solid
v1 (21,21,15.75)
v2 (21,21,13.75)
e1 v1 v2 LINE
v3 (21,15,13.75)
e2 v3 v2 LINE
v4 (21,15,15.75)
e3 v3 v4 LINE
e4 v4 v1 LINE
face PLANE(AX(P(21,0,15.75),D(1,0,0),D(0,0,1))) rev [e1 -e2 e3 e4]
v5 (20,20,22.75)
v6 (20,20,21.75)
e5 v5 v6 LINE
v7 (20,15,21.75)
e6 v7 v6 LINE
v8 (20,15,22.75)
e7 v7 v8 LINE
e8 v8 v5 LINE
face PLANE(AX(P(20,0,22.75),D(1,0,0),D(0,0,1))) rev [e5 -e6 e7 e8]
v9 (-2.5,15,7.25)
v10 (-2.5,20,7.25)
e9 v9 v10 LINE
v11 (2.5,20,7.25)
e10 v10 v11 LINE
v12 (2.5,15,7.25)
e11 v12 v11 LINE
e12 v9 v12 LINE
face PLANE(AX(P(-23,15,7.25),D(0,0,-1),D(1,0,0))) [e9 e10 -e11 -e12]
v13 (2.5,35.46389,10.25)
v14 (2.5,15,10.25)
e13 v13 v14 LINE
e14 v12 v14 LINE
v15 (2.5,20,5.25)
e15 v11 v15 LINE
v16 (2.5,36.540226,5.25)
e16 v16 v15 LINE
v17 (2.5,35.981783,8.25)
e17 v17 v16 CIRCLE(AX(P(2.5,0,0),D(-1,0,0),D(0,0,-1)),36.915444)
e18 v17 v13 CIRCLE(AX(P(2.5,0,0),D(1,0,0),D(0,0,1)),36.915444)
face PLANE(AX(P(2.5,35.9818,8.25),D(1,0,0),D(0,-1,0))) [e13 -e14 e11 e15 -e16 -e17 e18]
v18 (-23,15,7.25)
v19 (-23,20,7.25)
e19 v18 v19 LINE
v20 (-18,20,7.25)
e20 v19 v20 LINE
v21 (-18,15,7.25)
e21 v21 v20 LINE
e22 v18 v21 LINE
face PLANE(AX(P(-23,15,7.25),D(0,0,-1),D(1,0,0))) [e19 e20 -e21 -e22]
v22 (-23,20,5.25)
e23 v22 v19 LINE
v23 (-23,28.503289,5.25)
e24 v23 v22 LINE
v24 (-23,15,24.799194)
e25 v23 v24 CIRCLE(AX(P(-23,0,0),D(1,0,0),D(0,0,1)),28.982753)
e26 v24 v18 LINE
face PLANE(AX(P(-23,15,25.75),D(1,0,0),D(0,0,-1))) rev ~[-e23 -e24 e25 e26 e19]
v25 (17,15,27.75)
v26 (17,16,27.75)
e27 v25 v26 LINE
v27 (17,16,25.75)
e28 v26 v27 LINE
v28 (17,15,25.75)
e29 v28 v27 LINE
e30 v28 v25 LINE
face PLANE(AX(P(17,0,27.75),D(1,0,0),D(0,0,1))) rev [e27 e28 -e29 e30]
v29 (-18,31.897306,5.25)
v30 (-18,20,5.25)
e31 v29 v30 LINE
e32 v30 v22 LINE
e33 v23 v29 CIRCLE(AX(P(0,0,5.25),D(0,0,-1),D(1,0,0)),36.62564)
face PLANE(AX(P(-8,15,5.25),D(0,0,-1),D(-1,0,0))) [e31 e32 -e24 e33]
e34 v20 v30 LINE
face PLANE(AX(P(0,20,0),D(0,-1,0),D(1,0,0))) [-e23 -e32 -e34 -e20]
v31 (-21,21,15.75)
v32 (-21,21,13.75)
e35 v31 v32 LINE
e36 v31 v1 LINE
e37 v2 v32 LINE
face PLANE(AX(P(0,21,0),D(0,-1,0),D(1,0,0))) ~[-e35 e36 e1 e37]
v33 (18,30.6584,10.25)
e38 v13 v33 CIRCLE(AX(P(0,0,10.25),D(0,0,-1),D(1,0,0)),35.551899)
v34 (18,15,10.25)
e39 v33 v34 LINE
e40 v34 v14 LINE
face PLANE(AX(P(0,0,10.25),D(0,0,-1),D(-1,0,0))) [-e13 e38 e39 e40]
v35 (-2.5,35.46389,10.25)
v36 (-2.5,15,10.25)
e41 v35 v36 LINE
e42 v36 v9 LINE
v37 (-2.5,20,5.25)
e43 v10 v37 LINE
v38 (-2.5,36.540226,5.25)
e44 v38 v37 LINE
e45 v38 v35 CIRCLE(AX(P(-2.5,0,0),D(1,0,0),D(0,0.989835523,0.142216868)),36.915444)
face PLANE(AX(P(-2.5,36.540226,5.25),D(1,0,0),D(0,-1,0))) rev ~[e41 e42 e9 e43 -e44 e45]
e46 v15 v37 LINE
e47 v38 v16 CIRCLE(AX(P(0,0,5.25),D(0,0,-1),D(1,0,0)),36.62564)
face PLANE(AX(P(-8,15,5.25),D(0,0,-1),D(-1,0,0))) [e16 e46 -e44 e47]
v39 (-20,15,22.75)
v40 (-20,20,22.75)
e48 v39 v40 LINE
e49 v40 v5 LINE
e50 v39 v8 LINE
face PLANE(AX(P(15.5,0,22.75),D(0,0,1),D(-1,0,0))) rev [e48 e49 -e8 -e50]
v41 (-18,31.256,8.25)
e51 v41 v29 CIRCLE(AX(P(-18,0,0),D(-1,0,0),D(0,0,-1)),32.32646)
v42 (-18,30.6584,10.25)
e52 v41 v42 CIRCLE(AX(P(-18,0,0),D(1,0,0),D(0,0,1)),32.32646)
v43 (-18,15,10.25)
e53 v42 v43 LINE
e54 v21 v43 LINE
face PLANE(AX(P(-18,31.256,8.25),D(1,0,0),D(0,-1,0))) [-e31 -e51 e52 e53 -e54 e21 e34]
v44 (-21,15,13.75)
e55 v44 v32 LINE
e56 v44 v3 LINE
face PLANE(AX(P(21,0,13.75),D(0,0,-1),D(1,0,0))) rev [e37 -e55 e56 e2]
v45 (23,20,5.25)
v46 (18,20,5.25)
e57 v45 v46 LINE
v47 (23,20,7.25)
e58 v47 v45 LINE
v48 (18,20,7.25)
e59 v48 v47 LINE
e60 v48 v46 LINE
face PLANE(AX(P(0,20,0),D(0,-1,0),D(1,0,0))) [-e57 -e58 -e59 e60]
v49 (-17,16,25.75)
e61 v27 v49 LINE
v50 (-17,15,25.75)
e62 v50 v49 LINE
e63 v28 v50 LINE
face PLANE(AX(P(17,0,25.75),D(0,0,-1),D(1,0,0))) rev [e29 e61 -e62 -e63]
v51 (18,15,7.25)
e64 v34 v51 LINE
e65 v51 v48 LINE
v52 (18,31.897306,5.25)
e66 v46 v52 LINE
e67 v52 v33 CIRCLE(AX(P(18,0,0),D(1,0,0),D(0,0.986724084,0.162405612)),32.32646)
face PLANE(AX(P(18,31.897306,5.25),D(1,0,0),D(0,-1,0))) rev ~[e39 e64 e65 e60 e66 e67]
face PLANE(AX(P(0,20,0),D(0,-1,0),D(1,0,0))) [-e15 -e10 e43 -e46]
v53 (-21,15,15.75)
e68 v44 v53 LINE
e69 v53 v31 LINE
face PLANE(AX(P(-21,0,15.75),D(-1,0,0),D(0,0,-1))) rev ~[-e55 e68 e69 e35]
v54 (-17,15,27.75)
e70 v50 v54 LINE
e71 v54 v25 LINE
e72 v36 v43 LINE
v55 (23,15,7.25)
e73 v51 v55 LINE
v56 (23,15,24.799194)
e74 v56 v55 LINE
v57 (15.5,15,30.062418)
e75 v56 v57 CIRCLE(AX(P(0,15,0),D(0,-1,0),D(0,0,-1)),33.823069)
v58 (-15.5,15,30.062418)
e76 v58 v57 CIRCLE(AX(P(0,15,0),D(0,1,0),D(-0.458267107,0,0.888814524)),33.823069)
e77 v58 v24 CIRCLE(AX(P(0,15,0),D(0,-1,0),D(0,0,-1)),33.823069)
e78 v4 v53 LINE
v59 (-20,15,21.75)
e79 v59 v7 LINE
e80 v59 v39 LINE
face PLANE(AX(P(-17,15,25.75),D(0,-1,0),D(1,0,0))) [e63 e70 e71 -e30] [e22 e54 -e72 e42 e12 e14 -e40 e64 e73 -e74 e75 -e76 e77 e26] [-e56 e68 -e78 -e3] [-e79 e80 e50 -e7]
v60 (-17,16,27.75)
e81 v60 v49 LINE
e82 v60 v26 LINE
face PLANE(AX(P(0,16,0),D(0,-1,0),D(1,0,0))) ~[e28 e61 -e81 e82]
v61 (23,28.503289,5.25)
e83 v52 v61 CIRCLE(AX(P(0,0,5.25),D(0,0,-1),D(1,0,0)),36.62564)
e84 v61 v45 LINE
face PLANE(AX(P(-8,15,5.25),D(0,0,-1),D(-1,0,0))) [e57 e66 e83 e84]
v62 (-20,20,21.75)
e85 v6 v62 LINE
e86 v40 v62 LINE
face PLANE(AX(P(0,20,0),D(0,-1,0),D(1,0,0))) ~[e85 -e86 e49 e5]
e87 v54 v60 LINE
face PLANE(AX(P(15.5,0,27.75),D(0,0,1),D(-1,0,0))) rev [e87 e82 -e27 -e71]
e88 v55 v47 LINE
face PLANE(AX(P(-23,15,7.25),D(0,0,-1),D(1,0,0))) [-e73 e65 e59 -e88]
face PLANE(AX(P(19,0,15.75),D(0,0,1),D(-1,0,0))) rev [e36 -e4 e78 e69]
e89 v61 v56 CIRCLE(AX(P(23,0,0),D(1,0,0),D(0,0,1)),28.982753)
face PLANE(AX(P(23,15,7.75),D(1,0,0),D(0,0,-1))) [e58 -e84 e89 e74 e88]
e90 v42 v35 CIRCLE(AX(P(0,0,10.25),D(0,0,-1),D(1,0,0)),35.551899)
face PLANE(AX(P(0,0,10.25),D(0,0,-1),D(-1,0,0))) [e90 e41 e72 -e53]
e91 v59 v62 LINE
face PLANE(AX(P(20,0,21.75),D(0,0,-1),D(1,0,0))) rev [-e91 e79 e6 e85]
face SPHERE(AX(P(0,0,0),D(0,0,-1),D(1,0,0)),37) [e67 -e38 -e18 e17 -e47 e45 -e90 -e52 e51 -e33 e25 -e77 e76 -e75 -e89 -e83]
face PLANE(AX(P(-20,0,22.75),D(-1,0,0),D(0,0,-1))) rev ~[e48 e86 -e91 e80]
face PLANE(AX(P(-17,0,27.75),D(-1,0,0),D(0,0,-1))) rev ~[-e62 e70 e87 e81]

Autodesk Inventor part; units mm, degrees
sketch "スケッチ1" plane through (0, 0, 0) normal (0, 1, 0) x (-1, 0, 0)
  circle A0 centre (0, 0) radius 37
  line L0 (0, 0) -> (0, -37)
  line L1 (0, 0) -> (0, 37)
  dimension "d0" = 74
revolve "回転1" add sketch "スケッチ1" angle 180 about axis through (0, 0, 0) along (0, 0, 1) picked at (-2.7444, -24.3574) contours L1 L0 A0
sketch "スケッチ5" plane through (0, 0, 0) normal (0, -1, 0) x (1, 0, 0)
  line L0 (-20, -25) -> (20, -25)
  line L1 (20, -25) -> (20, -15)
  line L2 (20, -15) -> (-20, -15)
  line L3 (-20, -15) -> (-20, -25)
  line L4 (-20, -17) -> (-20, -15)
  line L5 (0, 27.75) -> (-17, 27.75)
  line L6 (-17, 27.75) -> (-17, 25.75)
  line L7 (-17, 25.75) -> (0, 25.75)
  line L8 (0, 25.75) -> (0, 27.75)
  line L9 (0, 22.75) -> (-20, 22.75)
  line L10 (-20, 22.75) -> (-20, 21.75)
  line L11 (-20, 21.75) -> (0, 21.75)
  line L12 (0, 21.75) -> (0, 22.75)
  line L13 (0, 15.75) -> (-21, 15.75)
  line L14 (-21, 15.75) -> (-21, 13.75)
  line L15 (-21, 13.75) -> (0, 13.75)
  line L16 (0, 13.75) -> (0, 15.75)
  line L17 (0, 7.75) -> (-23, 7.75)
  line L18 (-23, 7.75) -> (-23, 5.25)
  line L19 (-23, 5.25) -> (0, 5.25)
  line L20 (0, 5.25) -> (0, 7.75)
  circle A0 centre (0, 0) radius 37 projected
  circle A1 centre (0, 0) radius 37 projected
  line L21 (0, 37) -> (0, -37)
  line L22 (37, 0) -> (-37, 0)
  line L23 (-32.5, 5.25) -> (-23, 5.25)
  line L24 (-23, 5.25) -> (-23, -5.25)
  line L25 (-23, -5.25) -> (-32.5, -5.25)
  line L26 (-32.5, -5.25) -> (-32.5, 5.25)
  line L27 (-23, -8.0262) -> (-23, 5.25)
  line L28 (-27, 25.2982) -> (-27, -25.2982)
  line L29 (-15.5, 27.75) -> (-12, 27.75)
  line L30 (-12, 27.75) -> (-12, 35)
  line L31 (-12, 35) -> (-15.5, 35)
  line L32 (-15.5, 35) -> (-15.5, 27.75)
  line L33 (-15.5, 25.75) -> (0, 25.75)
  line L34 (0, 25.75) -> (0, 22.75)
  line L35 (0, 22.75) -> (-15.5, 22.75)
  line L36 (-15.5, 22.75) -> (-15.5, 25.75)
  line L37 (-19, 15.75) -> (0, 15.75)
  line L38 (0, 15.75) -> (0, 21.75)
  line L39 (0, 21.75) -> (-19, 21.75)
  line L40 (-19, 21.75) -> (-19, 15.75)
  line L41 (-19, 13.75) -> (0, 13.75)
  line L42 (0, 13.75) -> (0, 7.75)
  line L43 (0, 7.75) -> (-19, 7.75)
  line L44 (-19, 7.75) -> (-19, 13.75)
  line L45 (-23, 0) -> (-40.624, 0)
  line L46 (-23, 0) -> (-8.7712, 0)
  line L47 (-9.875, 5.25) -> (-23, 5.25)
  line L48 (-23, 5.25) -> (-23, -5.25)
  line L49 (-23, -5.25) -> (-9.875, -5.25)
  line L50 (-9.875, 5.25) -> (-23, -5.25) construction
  line L51 (-23, 5.25) -> (-9.875, -5.25) construction
  line L52 (-23, 7.25) -> (-33.5, 7.25)
  line L53 (-33.5, 7.25) -> (-33.5, -7.25)
  line L54 (-33.5, -7.25) -> (-23, -7.25)
  line L55 (-23, -7.25) -> (-23, 7.25)
  line L56 (-23, 7.25) -> (-33.5, -7.25) construction
  line L57 (-33.5, 7.25) -> (-23, -7.25) construction
  line L58 (-6.125, 5.25) -> (0, 5.25)
  line L59 (0, 5.25) -> (0, -5.25)
  line L60 (0, -5.25) -> (-6.125, -5.25)
  line L61 (-6.125, 5.25) -> (0, -5.25) construction
  line L62 (0, 5.25) -> (-6.125, -5.25) construction
  line L63 (-23, 5.25) -> (-27, 5.25)
  line L64 (-23, -5.25) -> (-27, -5.25)
  line L65 (-23, 7.25) -> (-27, 7.25)
  line L66 (-23, -7.25) -> (-27, -7.25)
  line L67 (26.3249, -26) -> (-26.3249, -26)
  line L68 (-6.125, 5.25) -> (-6.8, 5.25)
  line L69 (-6.2297, -5.25) -> (-6.125, -5.25)
  line L70 (-6.125, -5.25) -> (-6.125, 5.25)
  line L71 (-3, 7.75) -> (0, 7.75)
  line L72 (0, 22.75) -> (-4, 22.75)
  line L73 (-4, 21.75) -> (0, 21.75)
  line L74 (0, 21.75) -> (0, 22.75)
  line L75 (-6, 7.75) -> (-1, 7.75)
  line L76 (0, 5.25) -> (-6, 5.25)
  point P0 (0, -25)
  point P1 (0, -15)
  point P2 (0, 26.75)
  point P3 (0, 22.25)
  point P4 (0, 14.75)
  point P5 (0, 6.5)
  point P6 (-20, -20)
  point P7 (-27, -0.5262)
  point P8 (-27, -5.25)
  point P9 (-15.5, 24.25)
  point P10 (-15.5, 33.5969)
  point P11 (0, 27.75)
  point P12 (0, 37)
  point P13 (0, 25.75)
  point P14 (0, 13.75)
  point P15 (0, 15.75)
  point P16 (-27, 0)
  point P17 (-32.5, 0)
  point P18 (-23, 0)
  point P19 (-16.4375, 0)
  point P20 (-28.25, 0)
  point P21 (-3.0625, 0)
  point P22 (-27, 0.5)
  point P23 (-28, 0.4738)
  point P24 (-28, -11.5262)
  point P25 (-27, -11.5)
  point P26 (-23, -5.25)
  point P27 (-23, 5.25)
  point P28 (-23, -5.25)
  point P29 (0, 0)
  point P30 (-8, 6)
  point P31 (-26.3249, -26)
  point P32 (-8, -6)
  point P33 (0, 21.75)
  point P34 (0, 22.75)
  point P35 (-27, -7.25)
  point P36 (-27, 7.25)
  point P37 (-19, 10.75)
  dimension "d12" = 40
  dimension "d13" = 10
  dimension "d23" = 17
  dimension "d24" = 2
  dimension "d27" = 20
  dimension "d28" = 1
  dimension "d30" = 21
  dimension "d31" = 2
  dimension "d33" = 2.5
  dimension "d88" = 0
  dimension "d89" = 0
  dimension "d90" = 12
  dimension "d92" = 20
  dimension "d97" = 9.5
  dimension "d98" = 10.5
  dimension "d113" = 27
  dimension "d122" = 15.5
  dimension "d124" = 3
  dimension "d125" = 15.5
  dimension "d126" = 6
  dimension "d127" = 6
  dimension "d147" = 10.5
  dimension "d161" = 14.5
  dimension "d162" = 10.5
  dimension "d164" = 10.5
  dimension "d170" = 26
  dimension "d207" = 0
  dimension "d283" = 2
  dimension "d284" = 2
  dimension "d297" = 23
extrude "GNSボード" cut sketch "スケッチ5" against normal blind 16 contours L8 L7 L6 L5
extrude "GNSボード止めるよう" cut sketch "スケッチ5" against normal blind 15 contours L21 L5 L30 A0 | L30 L5 L32 A0 | L21 L9 L36 L7
extrude "アルミ板１" cut sketch "スケッチ5" against normal blind 20 contours L12 L11 L10 L9
extrude "メイン基板" cut sketch "スケッチ5" against normal blind 21 contours L15 L14 L13 L16
extrude "メイン止めるよう" cut sketch "スケッチ5" against normal blind 14.5 contours L17 L44 L15 L21 | L13 L40 L11 L21
extrude "アルミ板２" cut sketch "スケッチ5" against normal blind 20 contours L19 L18 L17 L20
extrude "電池ボックス入れ" cut sketch "スケッチ5" against normal blind 13 contours L3 L2 L21 L0 | L21 L2 L1 L0
extrude "side ut" cut sketch "スケッチ5" against normal blind 100 contours A0 L22 L53 L54 L28 | A0 L28 L52 L53 L22 | L54 L53 L22 L26 L25 L28 | L53 L52 L28 L23 L26 L22 | L25 L26 L22 L28 | L26 L23 L28 L22
extrude "motor case" add sketch "スケッチ5" against normal blind 7 contours L54 L53 L22 L26 L25 L28 | L28 L25 L27 L54 | L53 L52 L28 L23 L26 L22 | L28 L22 L24 L25 | L25 L26 L22 L28 | L22 L28 L23 L24 | L52 L18 L23 L28 | L26 L23 L28 L22
extrude "bottom cut" cut sketch "スケッチ5" against normal blind 90 contours L67 A0 L21 | L21 A0 L67
extrude "motor" [suppressed]
extrude "motor block" [suppressed]
sketch "スケッチ27" plane through (-33.5, 0, -7.25) normal (-1, 0, 0) x (0, 0, 1)
  line L0 (14.5, 0) -> (0, 0) projected
  circle A0 centre (7.25, 0) radius 3
  point P0 (7.25, 0)
  dimension "d198" = 6
extrude "押し出し36" cut sketch "スケッチ27" against normal blind 27
mirror "ミラー13" about plane through (0, 0, 0) normal (1, 0, 0) of "メイン止めるよう", "メイン基板", "アルミ板１", "GNSボード止めるよう", "GNSボード", "アルミ板２", "motor case", "押し出し36", "電池ボックス入れ", "side ut"
ref_plane "作業平面5" through (-17, 17.5, 25.75) normal (0, -1, 0) x (1, 0, 0)
ref_plane "作業平面6" through (20, 13, -15) normal (0, 0, -1) x (1, 0, 0)
sketch "スケッチ38" plane through (20, 13, -15) normal (0, 0, -1) x (1, 0, 0)
  line L0 (-40, 13) -> (0, 13) projected
  line L1 (-40, 13) -> (-40, 0) projected
  line L2 (-40, 0) -> (0, 0) projected
  line L3 (0, 13) -> (0, 0) projected
  line L4 (-38, 6) -> (-28, 6)
  line L5 (-28, 6) -> (-28, -3)
  line L6 (-28, -3) -> (-38, -3)
  line L7 (-38, -3) -> (-38, 6)
  point P0 (-20, 13)
  dimension "d235" = 3
  dimension "d236" = 9
  dimension "d237" = 10
  dimension "d238" = 2
extrude "押し出し44" cut sketch "スケッチ38" against normal blind 18 contours L7 L4 L5 L2 | L2 L5 L6 L7
ref_plane "作業平面7" through (27, 35, 7.25) normal (0, -1, 0) x (1, 0, 0)
sketch "スケッチ41" plane through (-17, 0, 25.75) normal (0, -1, 0) x (1, 0, 0)
  line L0 (-16.5, -22.75) -> (10.5, -22.75) projected
  line L1 (-6, -20.5) -> (-6, -18) projected
  line L2 (-6, -18) -> (-2, -18) projected
  line L3 (-2, -18) -> (-2, -12) projected
  line L4 (-2, -12) -> (-4, -12) projected
  line L5 (-4, -12) -> (-4, -10) projected
  line L6 (-4, -10) -> (-2, -10) projected
  line L7 (-2, -10) -> (-2, -4) projected
  line L8 (-2, -4) -> (-3, -4) projected
  line L9 (-3, -4) -> (-3, -3) projected
  line L10 (-3, -3) -> (1.5, -3) projected
  line L11 (1.5, -3) -> (1.5, 0) projected
  line L12 (1.5, 0) -> (0, 0) projected
  line L13 (0, 0) -> (0, 2) projected
  line L14 (0, 2) -> (1.5, 2) projected
  line L15 (1.5, 2) -> (1.5, 7.8469) projected
  arc A0 (1.5, 7.8469) -> (-10, -0.4518) centre (17, -25.75) ccw projected
  line L16 (-10, -0.4518) -> (-10, -18.5) projected
  line L17 (-10, -18.5) -> (-16.5, -18.5) projected
  line L18 (-16.5, -18.5) -> (-16.5, -22.75) projected
  line L19 (-2, -18) -> (-2, -12) projected
  line L20 (-4, -10) -> (-4, -12) projected
  line L21 (0, 2) -> (0, 0) projected
  circle A1 centre (-4, 0) radius 2
  line L22 (50.5, -28.75) -> (23.5, -28.75) projected
  line L23 (23.5, -28.75) -> (23.5, -22.75) projected
  line L24 (23.5, -22.75) -> (50.5, -22.75) projected
  line L25 (50.5, -18.5) -> (50.5, -22.75) projected
  line L26 (44, -18.5) -> (50.5, -18.5) projected
  line L27 (44, -18.5) -> (44, -0.4518) projected
  arc A2 (44, -0.4518) -> (32.5, 7.8469) centre (17, -25.75) ccw projected
  line L28 (32.5, 7.8469) -> (32.5, 2) projected
  line L29 (32.5, 2) -> (34, 2) projected
  line L30 (34, 2) -> (34, 0) projected
  line L31 (34, 0) -> (32.5, 0) projected
  line L32 (32.5, 0) -> (32.5, -3) projected
  line L33 (32.5, -3) -> (37, -3) projected
  line L34 (37, -3) -> (37, -4) projected
  line L35 (37, -4) -> (36, -4) projected
  line L36 (36, -4) -> (36, -10) projected
  line L37 (36, -10) -> (38, -10) projected
  line L38 (38, -10) -> (38, -12) projected
  line L39 (38, -12) -> (36, -12) projected
  line L40 (36, -12) -> (36, -18) projected
  line L41 (36, -18) -> (40, -18) projected
  line L42 (40, -18) -> (40, -20.5) projected
  line L43 (40, -20.5) -> (-6, -20.5) projected
  line L44 (10.5, -22.75) -> (10.5, -28.75) projected
  line L45 (10.5, -28.75) -> (-16.5, -28.75) projected
  line L46 (-16.5, -28.75) -> (-16.5, -33) projected
  line L47 (-16.5, -33) -> (-10, -33) projected
  line L48 (-10, -33) -> (-10, -51.0482) projected
  arc A3 (-10, -51.0482) -> (-9.3249, -51.75) centre (17, -25.75) ccw projected
  line L49 (-9.3249, -51.75) -> (43.3249, -51.75) projected
  arc A4 (43.3249, -51.75) -> (44, -51.0482) centre (17, -25.75) ccw projected
  line L50 (44, -51.0482) -> (44, -33) projected
  line L51 (50.5, -33) -> (44, -33) projected
  line L52 (50.5, -28.75) -> (50.5, -33) projected
  dimension "d252" = 4
  dimension "d253" = 4
  dimension "d254" = 3
extrude "押し出し46" cut sketch "スケッチ41" against normal blind 10 contours A1
mirror "ミラー15" about plane through (0, 0, 0) normal (1, 0, 0) of "押し出し46"
sketch "スケッチ42" plane through (-33.5, 0, -7.25) normal (0, -1, 0) x (1, 0, 0)
  circle A0 centre (10, -8) radius 2
  line L0 (13.5, -17.75) -> (13.5, -7.75) projected
  line L1 (10, 2) -> (1, 2) projected
  point P0 (33.5, 7.25)
  dimension "d257" = 3.5
  dimension "d258" = 4
  dimension "d259" = 10
extrude "押し出し47" cut sketch "スケッチ42" against normal blind 10
mirror "ミラー16" about plane through (0, 0, 0) normal (1, 0, 0) of "押し出し47"
ref_plane "作業平面8" through (-17, 15, 25.75) normal (0, -1, 0) x (1, 0, 0)
sketch "スケッチ45" plane through (-17, 15, 25.75) normal (0, -1, 0) x (1, 0, 0)
  circle A0 centre (-4, 0) radius 2 projected
  line L0 (-16.5, -22.75) -> (10.5, -22.75) projected
  line L1 (-6, -20.5) -> (-6, -18) projected
  line L2 (-6, -18) -> (-2, -18) projected
  line L3 (-2, -18) -> (-2, -12) projected
  line L4 (-2, -12) -> (-4, -12) projected
  line L5 (-4, -12) -> (-4, -10) projected
  line L6 (-4, -10) -> (-2, -10) projected
  line L7 (-2, -10) -> (-2, -4) projected
  line L8 (-2, -4) -> (-3, -4) projected
  line L9 (-3, -4) -> (-3, -3) projected
  line L10 (-3, -3) -> (1.5, -3) projected
  line L11 (1.5, -3) -> (1.5, 0) projected
  line L12 (1.5, 0) -> (0, 0) projected
  line L13 (0, 0) -> (0, 2) projected
  line L14 (0, 2) -> (1.5, 2) projected
  line L15 (1.5, 2) -> (1.5, 7.8469) projected
  arc A1 (1.5, 7.8469) -> (-10, -0.4518) centre (17, -25.75) ccw projected
  line L16 (-10, -0.4518) -> (-10, -18.5) projected
  line L17 (-10, -18.5) -> (-16.5, -18.5) projected
  line L18 (-16.5, -18.5) -> (-16.5, -22.75) projected
  arc A2 (32.5, 4.3124) -> (1.5, 4.3124) centre (17, -25.75) ccw projected
  line L19 (1.5, 2) -> (1.5, 4.3124) projected
  line L20 (32.5, 2) -> (1.5, 2) projected
  line L21 (32.5, 2) -> (32.5, 4.3124) projected
  circle A3 centre (38, 0) radius 2 projected
  circle A4 centre (38, 0) radius 2 projected
  line L22 (23.5, -22.75) -> (50.5, -22.75) projected
  line L23 (50.5, -18.5) -> (50.5, -22.75) projected
  line L24 (44, -18.5) -> (50.5, -18.5) projected
  line L25 (44, -18.5) -> (44, -0.4518) projected
  arc A5 (44, -0.4518) -> (32.5, 7.8469) centre (17, -25.75) ccw projected
  line L26 (32.5, 7.8469) -> (32.5, 2) projected
  line L27 (32.5, 2) -> (34, 2) projected
  line L28 (34, 2) -> (34, 0) projected
  line L29 (34, 0) -> (32.5, 0) projected
  line L30 (32.5, 0) -> (32.5, -3) projected
  line L31 (32.5, -3) -> (37, -3) projected
  line L32 (37, -3) -> (37, -4) projected
  line L33 (37, -4) -> (36, -4) projected
  line L34 (36, -4) -> (36, -10) projected
  line L35 (36, -10) -> (38, -10) projected
  line L36 (38, -10) -> (38, -12) projected
  line L37 (38, -12) -> (36, -12) projected
  line L38 (36, -12) -> (36, -18) projected
  line L39 (36, -18) -> (40, -18) projected
  line L40 (40, -18) -> (40, -20.5) projected
  circle A6 centre (-4, 0) radius 2 projected
  line L41 (1.5, 0) -> (32.5, 0) projected
  line L42 (32.5, -3) -> (1.5, -3) projected
  line L43 (32.5, -3) -> (32.5, 0) projected
  line L44 (1.5, 0) -> (32.5, 0) projected
  line L45 (1.5, -3) -> (1.5, 0) projected
  line L46 (34, 0) -> (0, 0) projected
  line L47 (34, 0) -> (34, 2) projected
  line L48 (34, 2) -> (0, 2) projected
  line L49 (0, 0) -> (0, 2) projected
  line L50 (36, -10) -> (-2, -10) projected
  line L51 (36, -10) -> (36, -4) projected
  line L52 (-2, -4) -> (36, -4) projected
  line L53 (-2, -10) -> (-2, -4) projected
  line L54 (38, -12) -> (-4, -12) projected
  line L55 (38, -12) -> (38, -10) projected
  line L56 (38, -10) -> (-4, -10) projected
  line L57 (-4, -12) -> (-4, -10) projected
  line L58 (36, -18) -> (-2, -18) projected
  line L59 (36, -18) -> (36, -12) projected
  line L60 (-2, -12) -> (36, -12) projected
  line L61 (-2, -18) -> (-2, -12) projected
  line L62 (40, -20.5) -> (-6, -20.5) projected
  line L63 (40, -20.5) -> (40, -18) projected
  line L64 (40, -18) -> (-6, -18) projected
  line L65 (-6, -20.5) -> (-6, -18) projected
  circle A7 centre (40.5, -41) radius 2 projected
  circle A8 centre (-6.5, -41) radius 2 projected
  line L66 (50.5, -28.75) -> (23.5, -28.75) projected
  line L67 (40, -20.5) -> (-6, -20.5) projected
  line L68 (10.5, -28.75) -> (-16.5, -28.75) projected
  line L69 (-6, -20.5) -> (-6, -18) projected
  line L70 (-16.5, -28.75) -> (-16.5, -33) projected
  line L71 (-16.5, -33) -> (-10, -33) projected
  line L72 (-10, -33) -> (-10, -51.0482) projected
  arc A9 (-10, -51.0482) -> (-9.3249, -51.75) centre (17, -25.75) ccw projected
  line L73 (-9.3249, -51.75) -> (43.3249, -51.75) projected
  arc A10 (43.3249, -51.75) -> (44, -51.0482) centre (17, -25.75) ccw projected
  line L74 (44, -51.0482) -> (44, -33) projected
  line L75 (50.5, -33) -> (44, -33) projected
  line L76 (50.5, -28.75) -> (50.5, -33) projected
  line L77 (40, -18) -> (40, -20.5) projected
  line L78 (-3, -40.75) -> (37, -40.75) projected
  line L79 (37, -40.75) -> (37, -50.75) projected
  line L80 (37, -50.75) -> (-3, -50.75) projected
  line L81 (-3, -50.75) -> (-3, -40.75) projected
  line L82 (-6, -18) -> (40, -18)
  line L83 (40, -18) -> (40, 8.0731)
  line L84 (40, 8.0731) -> (-6, 8.0731)
  line L85 (-6, 8.0731) -> (-6, -18)
  arc A11 (32.5, 4.3124) -> (1.5, 4.3124) centre (17, -25.75) ccw projected
  line L86 (32.5, 4.3124) -> (32.5, 7.8469) projected
  arc A12 (44, -0.4518) -> (32.5, 7.8469) centre (17, -25.75) ccw projected
  line L87 (44, -0.4518) -> (44, -51.0482) projected
  arc A13 (43.3249, -51.75) -> (44, -51.0482) centre (17, -25.75) ccw projected
  line L88 (43.3249, -51.75) -> (-9.3249, -51.75) projected
  arc A14 (-10, -51.0482) -> (-9.3249, -51.75) centre (17, -25.75) ccw projected
  line L89 (-10, -51.0482) -> (-10, -0.4518) projected
  arc A15 (1.5, 7.8469) -> (-10, -0.4518) centre (17, -25.75) ccw projected
  line L90 (1.5, 7.8469) -> (1.5, 4.3124) projected
  line L91 (9, -32) -> (9, -20) projected
  line L92 (-6, -20) -> (9, -20) projected
  line L93 (-6, -21) -> (-6, -20) projected
  line L94 (-15, -21) -> (-6, -21) projected
  line L95 (-15, -31) -> (-15, -21) projected
  line L96 (-6, -31) -> (-15, -31) projected
  line L97 (-6, -32) -> (-6, -31) projected
  line L98 (9, -32) -> (-6, -32) projected
  line L99 (50.5, -28.75) -> (23.5, -28.75) projected
  line L100 (50.5, -22.75) -> (50.5, -28.75) projected
  line L101 (23.5, -22.75) -> (50.5, -22.75) projected
  line L102 (-16.5, -22.75) -> (10.5, -22.75) projected
  line L103 (-16.5, -28.75) -> (-16.5, -22.75) projected
  line L104 (10.5, -28.75) -> (-16.5, -28.75) projected
  line L105 (10.5, -28.75) -> (10.5, -22.75) projected
  line L106 (23.5, -28.75) -> (23.5, -22.75) projected
  line L107 (50.5, -28.75) -> (23.5, -28.75) projected
  line L108 (23.5, -28.75) -> (23.5, -22.75) projected
  line L109 (40, -20.5) -> (-6, -20.5) projected
  line L110 (-6, -20.5) -> (-6, -18) projected
  line L111 (-6, -18) -> (-2, -18) projected
  line L112 (-2, -18) -> (-2, -12) projected
  line L113 (-2, -12) -> (-4, -12) projected
  line L114 (-4, -12) -> (-4, -10) projected
  line L115 (-4, -10) -> (-2, -10) projected
  line L116 (-2, -10) -> (-2, -4) projected
  line L117 (-2, -4) -> (-3, -4) projected
  line L118 (-3, -4) -> (-3, -3) projected
  line L119 (-3, -3) -> (1.5, -3) projected
  line L120 (1.5, -3) -> (1.5, 0) projected
  line L121 (1.5, 0) -> (0, 0) projected
  line L122 (0, 0) -> (0, 2) projected
  line L123 (0, 2) -> (1.5, 2) projected
  line L124 (1.5, 2) -> (1.5, 7.8469) projected
  arc A16 (1.5, 7.8469) -> (-10, -0.4518) centre (17, -25.75) ccw projected
  line L125 (-10, -0.4518) -> (-10, -18.5) projected
  line L126 (-10, -18.5) -> (-16.5, -18.5) projected
  line L127 (-16.5, -18.5) -> (-16.5, -22.75) projected
  line L128 (-16.5, -22.75) -> (10.5, -22.75) projected
  line L129 (10.5, -22.75) -> (10.5, -28.75) projected
  line L130 (10.5, -28.75) -> (-16.5, -28.75) projected
  line L131 (-16.5, -28.75) -> (-16.5, -33) projected
  line L132 (-16.5, -33) -> (-10, -33) projected
  line L133 (-10, -33) -> (-10, -51.0482) projected
  arc A17 (-10, -51.0482) -> (-9.3249, -51.75) centre (17, -25.75) ccw projected
  line L134 (-9.3249, -51.75) -> (43.3249, -51.75) projected
  arc A18 (43.3249, -51.75) -> (44, -51.0482) centre (17, -25.75) ccw projected
  line L135 (44, -51.0482) -> (44, -33) projected
  line L136 (50.5, -33) -> (44, -33) projected
  line L137 (50.5, -28.75) -> (50.5, -33) projected
  line L138 (50.5, -28.75) -> (23.5, -28.75) projected
  line L139 (23.5, -28.75) -> (23.5, -22.75) projected
  line L140 (23.5, -22.75) -> (50.5, -22.75) projected
  line L141 (50.5, -18.5) -> (50.5, -22.75) projected
  line L142 (44, -18.5) -> (50.5, -18.5) projected
  line L143 (44, -18.5) -> (44, -0.4518) projected
  arc A19 (44, -0.4518) -> (32.5, 7.8469) centre (17, -25.75) ccw projected
  line L144 (32.5, 7.8469) -> (32.5, 2) projected
  line L145 (32.5, 2) -> (34, 2) projected
  line L146 (34, 2) -> (34, 0) projected
  line L147 (34, 0) -> (32.5, 0) projected
  line L148 (32.5, 0) -> (32.5, -3) projected
  line L149 (32.5, -3) -> (37, -3) projected
  line L150 (37, -3) -> (37, -4) projected
  line L151 (37, -4) -> (36, -4) projected
  line L152 (36, -4) -> (36, -10) projected
  line L153 (36, -10) -> (38, -10) projected
  line L154 (38, -10) -> (38, -12) projected
  line L155 (38, -12) -> (36, -12) projected
  line L156 (36, -12) -> (36, -18) projected
  line L157 (36, -18) -> (40, -18) projected
  line L158 (40, -18) -> (40, -20.5) projected
  line L159 (40, -20.5) -> (-6, -20.5) projected
  line L160 (10.5, -22.75) -> (10.5, -28.75) projected
  line L161 (10.5, -28.75) -> (-16.5, -28.75) projected
  line L162 (-16.5, -28.75) -> (-16.5, -33) projected
  line L163 (-16.5, -33) -> (-10, -33) projected
  line L164 (-10, -33) -> (-10, -51.0482) projected
  arc A20 (-10, -51.0482) -> (-9.3249, -51.75) centre (17, -25.75) ccw projected
  line L165 (-9.3249, -51.75) -> (43.3249, -51.75) projected
  arc A21 (43.3249, -51.75) -> (44, -51.0482) centre (17, -25.75) ccw projected
  line L166 (44, -51.0482) -> (44, -33) projected
  line L167 (50.5, -33) -> (44, -33) projected
  line L168 (50.5, -28.75) -> (50.5, -33) projected
  line L169 (23.5, -28.75) -> (23.5, -22.75) projected
  line L170 (23.5, -22.75) -> (50.5, -22.75) projected
  line L171 (50.5, -18.5) -> (50.5, -22.75) projected
  line L172 (44, -18.5) -> (50.5, -18.5) projected
  line L173 (44, -18.5) -> (44, -0.4518) projected
  arc A22 (44, -0.4518) -> (32.5, 7.8469) centre (17, -25.75) ccw projected
  line L174 (32.5, 7.8469) -> (32.5, 2) projected
  line L175 (32.5, 2) -> (34, 2) projected
  line L176 (34, 2) -> (34, 0) projected
  line L177 (34, 0) -> (32.5, 0) projected
  line L178 (32.5, 0) -> (32.5, -3) projected
  line L179 (32.5, -3) -> (37, -3) projected
  line L180 (37, -3) -> (37, -4) projected
  line L181 (37, -4) -> (36, -4) projected
  line L182 (36, -4) -> (36, -10) projected
  line L183 (36, -10) -> (38, -10) projected
  line L184 (38, -10) -> (38, -12) projected
  line L185 (38, -12) -> (36, -12) projected
  line L186 (36, -12) -> (36, -18) projected
  line L187 (36, -18) -> (40, -18) projected
  line L188 (-6, -18) -> (-2, -18) projected
  line L189 (-2, -18) -> (-2, -12) projected
  line L190 (-2, -12) -> (-4, -12) projected
  line L191 (-4, -12) -> (-4, -10) projected
  line L192 (-4, -10) -> (-2, -10) projected
  line L193 (-2, -10) -> (-2, -4) projected
  line L194 (-2, -4) -> (-3, -4) projected
  line L195 (-3, -4) -> (-3, -3) projected
  line L196 (-3, -3) -> (1.5, -3) projected
  line L197 (1.5, -3) -> (1.5, 0) projected
  line L198 (1.5, 0) -> (0, 0) projected
  line L199 (0, 0) -> (0, 2) projected
  line L200 (0, 2) -> (1.5, 2) projected
  line L201 (1.5, 2) -> (1.5, 7.8469) projected
  arc A23 (1.5, 7.8469) -> (-10, -0.4518) centre (17, -25.75) ccw projected
  line L202 (-10, -0.4518) -> (-10, -18.5) projected
  line L203 (-10, -18.5) -> (-16.5, -18.5) projected
  line L204 (-16.5, -18.5) -> (-16.5, -22.75) projected
  line L205 (-16.5, -22.75) -> (10.5, -22.75) projected
  line L206 (10.5, -22.75) -> (10.5, -28.75) projected
  point P0 (-10, -33)
  point P1 (44, -33)
  point P2 (44, -18.5)
  point P3 (40, 3.2328)
  point P4 (40, -18)
  point P5 (-6, -20.5)
  point P6 (-6, -18)
  point P7 (-6, 3.2328)
  point P8 (-10, -33)
  point P9 (44, -33)
  point P10 (44, -18.5)
  point P11 (-10, -18.5)
  point P12 (44, -22.75)
  point P13 (-10, -22.75)
  point P14 (-10, -18.5)
  point P15 (44, -28.75)
  point P16 (-10, -28.75)
  point P17 (32.5, 4.3124)
  point P18 (1.5, 4.3124)
  point P19 (1.5, 4.3124)
  point P20 (32.5, 4.3124)
  point P21 (-10, -22.75)
  point P22 (-10, -28.75)
  point P23 (32.5, 4.3124)
  point P24 (1.5, 4.3124)
  point P25 (44, -22.75)
  point P26 (44, -28.75)
  point P27 (-10, -18.5)
  point P28 (50.5, -28.75)
  point P29 (44, -33)
  point P30 (1.5, 4.3124)
  point P31 (32.5, 4.3124)
  point P32 (50.5, -28.75)
  point P33 (44, -28.75)
  point P34 (44, -22.75)
  point P35 (32.5, 4.3124)
  point P36 (1.5, 4.3124)
  point P37 (44, -33)
  point P38 (-10, -22.75)
  point P39 (-10, -28.75)
  point P40 (1.5, 4.3124)
  point P41 (32.5, 4.3124)
  point P42 (-16.5, -28.75)
  point P43 (-16.5, -28.75)
extrude "side and front cut" cut sketch "スケッチ45" along normal mid plane 100 contours L85 L1 L93 L94 L89 L16 A1 | L89 L94 L95 L0 L18 L17 | L62 L91 L0 L89 L94 L93 | L89 L0 L95 L94 | L62 L40 L83 A5 L25 L87 L22 L106 L66 L74 A10 L73 A9 L72 L89 L96 L97 L98 L91 L68 L105 L0 | L0 L95 L68 L103 | L89 L68 L95 L0 | L0 L91 L68 L89 | L0 L105 L68 L91 | L68 L95 L96 L89 L71 L70 | L89 L96 L95 L68 | L68 L91 L98 L97 L96 L89 | L24 L23 L22 L87 | L87 L66 L106 L22 | L22 L100 L66 L87 | L66 L76 L75 L87 | A7 | A8 | L78 L79 L80 L81
sketch "スケッチ46" plane through (-17, 15, 25.75) normal (0, -1, 0) x (1, 0, 0)
  line L0 (-6, 0) -> (-6, -18) projected
  line L1 (-6, -18) -> (-2, -18) projected
  line L2 (-2, -18) -> (-2, -12) projected
  line L3 (-2, -12) -> (-4, -12) projected
  line L4 (-4, -12) -> (-4, -10) projected
  line L5 (-4, -10) -> (-2, -10) projected
  line L6 (-2, -10) -> (-2, -4) projected
  line L7 (-2, -4) -> (-3, -4) projected
  line L8 (-3, -4) -> (-3, -3) projected
  line L9 (-3, -3) -> (1.5, -3) projected
  line L10 (1.5, -3) -> (1.5, 0) projected
  line L11 (1.5, 0) -> (0, 0) projected
  line L12 (0, 0) -> (0, 2) projected
  line L13 (0, 2) -> (1.5, 2) projected
  line L14 (1.5, 2) -> (1.5, 7.8469) projected
  arc A0 (1.5, 7.8469) -> (-6, 3.2328) centre (17, -25.75) ccw projected
  line L15 (-6, 3.2328) -> (-6, 0) projected
  circle A1 centre (-4, 0) radius 2 projected
  circle A2 centre (-4, 0) radius 2 projected
  line L16 (40, -18) -> (40, 0) projected
  circle A3 centre (38, 0) radius 2 projected
  line L17 (40, 0) -> (40, 3.2328) projected
  arc A4 (40, 3.2328) -> (32.5, 7.8469) centre (17, -25.75) ccw projected
  line L18 (32.5, 7.8469) -> (32.5, 2) projected
  line L19 (32.5, 2) -> (34, 2) projected
  line L20 (34, 2) -> (34, 0) projected
  line L21 (34, 0) -> (32.5, 0) projected
  line L22 (32.5, 0) -> (32.5, -3) projected
  line L23 (32.5, -3) -> (37, -3) projected
  line L24 (37, -3) -> (37, -4) projected
  line L25 (37, -4) -> (36, -4) projected
  line L26 (36, -4) -> (36, -10) projected
  line L27 (36, -10) -> (38, -10) projected
  line L28 (38, -10) -> (38, -12) projected
  line L29 (38, -12) -> (36, -12) projected
  line L30 (36, -12) -> (36, -18) projected
  line L31 (36, -18) -> (40, -18) projected
  arc A5 (32.5, 4.3124) -> (1.5, 4.3124) centre (17, -25.75) ccw projected
  line L32 (1.5, 2) -> (1.5, 4.3124) projected
  line L33 (32.5, 2) -> (1.5, 2) projected
  line L34 (32.5, 2) -> (32.5, 4.3124) projected
  line L35 (34, 0) -> (0, 0) projected
  line L36 (34, 0) -> (34, 2) projected
  line L37 (34, 2) -> (0, 2) projected
  line L38 (0, 0) -> (0, 2) projected
  line L39 (32.5, -3) -> (1.5, -3) projected
  line L40 (32.5, -3) -> (32.5, 0) projected
  line L41 (1.5, 0) -> (32.5, 0) projected
  line L42 (1.5, -3) -> (1.5, 0) projected
  line L43 (36, -10) -> (-2, -10) projected
  line L44 (36, -10) -> (36, -4) projected
  line L45 (-2, -4) -> (36, -4) projected
  line L46 (-2, -10) -> (-2, -4) projected
  line L47 (36, -18) -> (-2, -18) projected
  line L48 (36, -18) -> (36, -12) projected
  line L49 (-2, -12) -> (36, -12) projected
  line L50 (-2, -18) -> (-2, -12) projected
  point P0 (1.5, 4.3124)
  point P1 (-2, -18)
  point P2 (36, -18)
extrude "front cut 2" cut sketch "スケッチ46" along normal blind 100 contours L15 A0 L14 L13 L12 L11 L10 L9 L8 L7 L6 L5 L4 L3 L2 L1 L0 | A1 | L2 L49 L30 L47 | L3 L4 L5 L43 L27 L28 L29 L49 | A3 | L30 L29 L28 L27 L26 L25 L24 L23 L22 L21 L20 L19 L18 A4 L17 L16 L31 | A5 L18 L33 L14 | L33 L19 L20 L21 L35 L11 L12 L13 | L6 L45 L26 L43 | L7 L8 L9 L39 L23 L24 L25 L45 | L35 L22 L39 L10
sketch "スケッチ48" plane through (0, 0, 5.25) normal (0, 0, -1) x (-1, 0, 0)
  line L0 (-23, 20) -> (23, 20) projected
  line L1 (23, 28.5033) -> (23, 20) projected
  arc A0 (23, 28.5033) -> (-23, 28.5033) centre (0, 0) ccw projected
  line L2 (-23, 28.5033) -> (-23, 20) projected
  line L3 (-23, 15) -> (23, 15) projected
  line L4 (-23, 15) -> (-23, 20) projected
  line L5 (23, 15) -> (23, 20) projected
  line L6 (-23, 40) -> (-18, 40)
  line L7 (-18, 40) -> (-18, 15)
  line L8 (-18, 15) -> (-23, 15)
  line L9 (-23, 15) -> (-23, 40)
  line L10 (18, 40) -> (23, 40)
  line L11 (23, 40) -> (23, 15)
  line L12 (23, 15) -> (18, 15)
  line L13 (18, 15) -> (18, 40)
  line L14 (-2.5, 36.6256) -> (2.5, 36.6256)
  line L15 (2.5, 36.6256) -> (2.5, 20)
  line L16 (2.5, 20) -> (-2.5, 20)
  line L17 (-2.5, 20) -> (-2.5, 36.6256)
  line L18 (0, 0) -> (0, 36.6256)
  point P0 (18, 20)
  point P1 (18, 31.8973)
  point P2 (-18, 31.8973)
  point P3 (-18, 20)
  point P4 (2.5, 36.5402)
  point P5 (2.5, 20)
  point P6 (-2.5, 36.5402)
  dimension "d274" = 25
  dimension "d275" = 5
  dimension "d276" = 25
  dimension "d277" = 5
  dimension "d280" = 5
  dimension "d282" = 2.5
extrude "lock cut" cut sketch "スケッチ48" against normal blind 3 contours L7 A0 L17 L0 | L15 A0 L13 L0
sketch "スケッチ49" plane through (23, 15, 7.75) normal (0, 0, -1) x (-1, 0, 0)
  line L0 (46, 0) -> (0, 0) projected
  line L1 (46, -15) -> (46, 5) projected
  line L2 (0, 0) -> (46, 0)
  line L3 (46, 0) -> (46, 5)
  line L4 (46, 5) -> (0, 5)
  line L5 (0, 5) -> (0, 0)
  point P0 (23, -15)
  point P1 (38.5, 0)
  point P2 (7.5, 0)
extrude "押し出し52" cut sketch "スケッチ49" against normal up to surface (0.5 mm away)
sketch "スケッチ50" plane through (0, 0, 5.25) normal (0, 0, -1) x (-1, 0, 0)
  point P0 (0, 0)
sketch "スケッチ51" plane through (0, 0, 8.25) normal (0, 0, -1) x (-1, 0, 0)
  line L0 (-23, 15) -> (-23, 28.5033) projected
  line L1 (18, 20) -> (23, 20) projected
  line L2 (-23, 15) -> (23, 15)
  line L3 (23, 15) -> (23, 20)
  line L4 (23, 20) -> (-23, 20)
  line L5 (-23, 20) -> (-23, 15)
  arc A0 (18, 31.256) -> (2.5, 35.9818) centre (0, 0) ccw projected
  line L6 (2.5, 20) -> (2.5, 35.9818) projected
  line L7 (-2.5, 35.9818) -> (-2.5, 20) projected
  arc A1 (-2.5, 35.9818) -> (-18, 31.256) centre (0, 0) ccw projected
  line L8 (-18, 20) -> (-18, 31.256) projected
  line L9 (18, 31.256) -> (18, 20) projected
  line L10 (-2.5, 20) -> (-18, 20) projected
  line L11 (18, 20) -> (2.5, 20) projected
  point P0 (2.5, 20)
  point P1 (-2.5, 20)
extrude "押し出し53" cut sketch "スケッチ51" against normal blind 2
sketch "スケッチ52" plane through (0, 0, 10.25) normal (0, 0, -1) x (-1, 0, 0)
  line L0 (-23, 20) -> (-18, 20) projected
  line L1 (-23, 20) -> (-18, 20) projected
  line L2 (-2.5, 20) -> (2.5, 20) projected
  line L3 (-2.5, 20) -> (2.5, 20) projected
  point P0 (0, 0)
sketch "スケッチ53" plane through (0, 15, 0) normal (0, -1, 0) x (1, 0, 0)
  line L0 (18, 10.25) -> (18, 5.25) projected
  line L1 (23, 5.25) -> (18, 5.25) projected
  line L2 (23, 10.25) -> (23, 5.25) projected
  line L3 (23, 10.25) -> (18, 10.25) projected
  line L4 (-2.5, 10.25) -> (-2.5, 5.25) projected
  line L5 (2.5, 5.25) -> (-2.5, 5.25) projected
  line L6 (2.5, 5.25) -> (2.5, 10.25) projected
  line L7 (2.5, 10.25) -> (-2.5, 10.25) projected
  line L8 (-18, 5.25) -> (-18, 10.25) projected
  line L9 (-18, 10.25) -> (-23, 10.25) projected
  line L10 (-23, 5.25) -> (-23, 10.25) projected
  line L11 (-18, 5.25) -> (-23, 5.25) projected
  point P0 (0, 0)
extrude "押し出し54" add sketch "スケッチ53" against normal up to surface (5 mm away)
sketch "スケッチ54" plane through (0, 15, 0) normal (0, -1, 0) x (1, 0, 0)
  line L0 (-18, 10.25) -> (-2.5, 10.25) projected
  line L1 (23, 24.7992) -> (23, 5.25) projected
  line L2 (23, 5.25) -> (-23, 5.25)
  line L3 (-23, 5.25) -> (-23, 7.25)
  line L4 (-23, 7.25) -> (23, 7.25)
  line L5 (23, 7.25) -> (23, 5.25)
  line L6 (18, 5.25) -> (23, 5.25) projected
  point P0 (0, 0)
  point P1 (23, 5.25)
  point P2 (23, 7.25)
  dimension "d295" = 2
  dimension "d296" = 46
extrude "押し出し55" cut sketch "スケッチ54" against normal blind 5
properties part number "body back for main printing" material "ABS プラスチック"
